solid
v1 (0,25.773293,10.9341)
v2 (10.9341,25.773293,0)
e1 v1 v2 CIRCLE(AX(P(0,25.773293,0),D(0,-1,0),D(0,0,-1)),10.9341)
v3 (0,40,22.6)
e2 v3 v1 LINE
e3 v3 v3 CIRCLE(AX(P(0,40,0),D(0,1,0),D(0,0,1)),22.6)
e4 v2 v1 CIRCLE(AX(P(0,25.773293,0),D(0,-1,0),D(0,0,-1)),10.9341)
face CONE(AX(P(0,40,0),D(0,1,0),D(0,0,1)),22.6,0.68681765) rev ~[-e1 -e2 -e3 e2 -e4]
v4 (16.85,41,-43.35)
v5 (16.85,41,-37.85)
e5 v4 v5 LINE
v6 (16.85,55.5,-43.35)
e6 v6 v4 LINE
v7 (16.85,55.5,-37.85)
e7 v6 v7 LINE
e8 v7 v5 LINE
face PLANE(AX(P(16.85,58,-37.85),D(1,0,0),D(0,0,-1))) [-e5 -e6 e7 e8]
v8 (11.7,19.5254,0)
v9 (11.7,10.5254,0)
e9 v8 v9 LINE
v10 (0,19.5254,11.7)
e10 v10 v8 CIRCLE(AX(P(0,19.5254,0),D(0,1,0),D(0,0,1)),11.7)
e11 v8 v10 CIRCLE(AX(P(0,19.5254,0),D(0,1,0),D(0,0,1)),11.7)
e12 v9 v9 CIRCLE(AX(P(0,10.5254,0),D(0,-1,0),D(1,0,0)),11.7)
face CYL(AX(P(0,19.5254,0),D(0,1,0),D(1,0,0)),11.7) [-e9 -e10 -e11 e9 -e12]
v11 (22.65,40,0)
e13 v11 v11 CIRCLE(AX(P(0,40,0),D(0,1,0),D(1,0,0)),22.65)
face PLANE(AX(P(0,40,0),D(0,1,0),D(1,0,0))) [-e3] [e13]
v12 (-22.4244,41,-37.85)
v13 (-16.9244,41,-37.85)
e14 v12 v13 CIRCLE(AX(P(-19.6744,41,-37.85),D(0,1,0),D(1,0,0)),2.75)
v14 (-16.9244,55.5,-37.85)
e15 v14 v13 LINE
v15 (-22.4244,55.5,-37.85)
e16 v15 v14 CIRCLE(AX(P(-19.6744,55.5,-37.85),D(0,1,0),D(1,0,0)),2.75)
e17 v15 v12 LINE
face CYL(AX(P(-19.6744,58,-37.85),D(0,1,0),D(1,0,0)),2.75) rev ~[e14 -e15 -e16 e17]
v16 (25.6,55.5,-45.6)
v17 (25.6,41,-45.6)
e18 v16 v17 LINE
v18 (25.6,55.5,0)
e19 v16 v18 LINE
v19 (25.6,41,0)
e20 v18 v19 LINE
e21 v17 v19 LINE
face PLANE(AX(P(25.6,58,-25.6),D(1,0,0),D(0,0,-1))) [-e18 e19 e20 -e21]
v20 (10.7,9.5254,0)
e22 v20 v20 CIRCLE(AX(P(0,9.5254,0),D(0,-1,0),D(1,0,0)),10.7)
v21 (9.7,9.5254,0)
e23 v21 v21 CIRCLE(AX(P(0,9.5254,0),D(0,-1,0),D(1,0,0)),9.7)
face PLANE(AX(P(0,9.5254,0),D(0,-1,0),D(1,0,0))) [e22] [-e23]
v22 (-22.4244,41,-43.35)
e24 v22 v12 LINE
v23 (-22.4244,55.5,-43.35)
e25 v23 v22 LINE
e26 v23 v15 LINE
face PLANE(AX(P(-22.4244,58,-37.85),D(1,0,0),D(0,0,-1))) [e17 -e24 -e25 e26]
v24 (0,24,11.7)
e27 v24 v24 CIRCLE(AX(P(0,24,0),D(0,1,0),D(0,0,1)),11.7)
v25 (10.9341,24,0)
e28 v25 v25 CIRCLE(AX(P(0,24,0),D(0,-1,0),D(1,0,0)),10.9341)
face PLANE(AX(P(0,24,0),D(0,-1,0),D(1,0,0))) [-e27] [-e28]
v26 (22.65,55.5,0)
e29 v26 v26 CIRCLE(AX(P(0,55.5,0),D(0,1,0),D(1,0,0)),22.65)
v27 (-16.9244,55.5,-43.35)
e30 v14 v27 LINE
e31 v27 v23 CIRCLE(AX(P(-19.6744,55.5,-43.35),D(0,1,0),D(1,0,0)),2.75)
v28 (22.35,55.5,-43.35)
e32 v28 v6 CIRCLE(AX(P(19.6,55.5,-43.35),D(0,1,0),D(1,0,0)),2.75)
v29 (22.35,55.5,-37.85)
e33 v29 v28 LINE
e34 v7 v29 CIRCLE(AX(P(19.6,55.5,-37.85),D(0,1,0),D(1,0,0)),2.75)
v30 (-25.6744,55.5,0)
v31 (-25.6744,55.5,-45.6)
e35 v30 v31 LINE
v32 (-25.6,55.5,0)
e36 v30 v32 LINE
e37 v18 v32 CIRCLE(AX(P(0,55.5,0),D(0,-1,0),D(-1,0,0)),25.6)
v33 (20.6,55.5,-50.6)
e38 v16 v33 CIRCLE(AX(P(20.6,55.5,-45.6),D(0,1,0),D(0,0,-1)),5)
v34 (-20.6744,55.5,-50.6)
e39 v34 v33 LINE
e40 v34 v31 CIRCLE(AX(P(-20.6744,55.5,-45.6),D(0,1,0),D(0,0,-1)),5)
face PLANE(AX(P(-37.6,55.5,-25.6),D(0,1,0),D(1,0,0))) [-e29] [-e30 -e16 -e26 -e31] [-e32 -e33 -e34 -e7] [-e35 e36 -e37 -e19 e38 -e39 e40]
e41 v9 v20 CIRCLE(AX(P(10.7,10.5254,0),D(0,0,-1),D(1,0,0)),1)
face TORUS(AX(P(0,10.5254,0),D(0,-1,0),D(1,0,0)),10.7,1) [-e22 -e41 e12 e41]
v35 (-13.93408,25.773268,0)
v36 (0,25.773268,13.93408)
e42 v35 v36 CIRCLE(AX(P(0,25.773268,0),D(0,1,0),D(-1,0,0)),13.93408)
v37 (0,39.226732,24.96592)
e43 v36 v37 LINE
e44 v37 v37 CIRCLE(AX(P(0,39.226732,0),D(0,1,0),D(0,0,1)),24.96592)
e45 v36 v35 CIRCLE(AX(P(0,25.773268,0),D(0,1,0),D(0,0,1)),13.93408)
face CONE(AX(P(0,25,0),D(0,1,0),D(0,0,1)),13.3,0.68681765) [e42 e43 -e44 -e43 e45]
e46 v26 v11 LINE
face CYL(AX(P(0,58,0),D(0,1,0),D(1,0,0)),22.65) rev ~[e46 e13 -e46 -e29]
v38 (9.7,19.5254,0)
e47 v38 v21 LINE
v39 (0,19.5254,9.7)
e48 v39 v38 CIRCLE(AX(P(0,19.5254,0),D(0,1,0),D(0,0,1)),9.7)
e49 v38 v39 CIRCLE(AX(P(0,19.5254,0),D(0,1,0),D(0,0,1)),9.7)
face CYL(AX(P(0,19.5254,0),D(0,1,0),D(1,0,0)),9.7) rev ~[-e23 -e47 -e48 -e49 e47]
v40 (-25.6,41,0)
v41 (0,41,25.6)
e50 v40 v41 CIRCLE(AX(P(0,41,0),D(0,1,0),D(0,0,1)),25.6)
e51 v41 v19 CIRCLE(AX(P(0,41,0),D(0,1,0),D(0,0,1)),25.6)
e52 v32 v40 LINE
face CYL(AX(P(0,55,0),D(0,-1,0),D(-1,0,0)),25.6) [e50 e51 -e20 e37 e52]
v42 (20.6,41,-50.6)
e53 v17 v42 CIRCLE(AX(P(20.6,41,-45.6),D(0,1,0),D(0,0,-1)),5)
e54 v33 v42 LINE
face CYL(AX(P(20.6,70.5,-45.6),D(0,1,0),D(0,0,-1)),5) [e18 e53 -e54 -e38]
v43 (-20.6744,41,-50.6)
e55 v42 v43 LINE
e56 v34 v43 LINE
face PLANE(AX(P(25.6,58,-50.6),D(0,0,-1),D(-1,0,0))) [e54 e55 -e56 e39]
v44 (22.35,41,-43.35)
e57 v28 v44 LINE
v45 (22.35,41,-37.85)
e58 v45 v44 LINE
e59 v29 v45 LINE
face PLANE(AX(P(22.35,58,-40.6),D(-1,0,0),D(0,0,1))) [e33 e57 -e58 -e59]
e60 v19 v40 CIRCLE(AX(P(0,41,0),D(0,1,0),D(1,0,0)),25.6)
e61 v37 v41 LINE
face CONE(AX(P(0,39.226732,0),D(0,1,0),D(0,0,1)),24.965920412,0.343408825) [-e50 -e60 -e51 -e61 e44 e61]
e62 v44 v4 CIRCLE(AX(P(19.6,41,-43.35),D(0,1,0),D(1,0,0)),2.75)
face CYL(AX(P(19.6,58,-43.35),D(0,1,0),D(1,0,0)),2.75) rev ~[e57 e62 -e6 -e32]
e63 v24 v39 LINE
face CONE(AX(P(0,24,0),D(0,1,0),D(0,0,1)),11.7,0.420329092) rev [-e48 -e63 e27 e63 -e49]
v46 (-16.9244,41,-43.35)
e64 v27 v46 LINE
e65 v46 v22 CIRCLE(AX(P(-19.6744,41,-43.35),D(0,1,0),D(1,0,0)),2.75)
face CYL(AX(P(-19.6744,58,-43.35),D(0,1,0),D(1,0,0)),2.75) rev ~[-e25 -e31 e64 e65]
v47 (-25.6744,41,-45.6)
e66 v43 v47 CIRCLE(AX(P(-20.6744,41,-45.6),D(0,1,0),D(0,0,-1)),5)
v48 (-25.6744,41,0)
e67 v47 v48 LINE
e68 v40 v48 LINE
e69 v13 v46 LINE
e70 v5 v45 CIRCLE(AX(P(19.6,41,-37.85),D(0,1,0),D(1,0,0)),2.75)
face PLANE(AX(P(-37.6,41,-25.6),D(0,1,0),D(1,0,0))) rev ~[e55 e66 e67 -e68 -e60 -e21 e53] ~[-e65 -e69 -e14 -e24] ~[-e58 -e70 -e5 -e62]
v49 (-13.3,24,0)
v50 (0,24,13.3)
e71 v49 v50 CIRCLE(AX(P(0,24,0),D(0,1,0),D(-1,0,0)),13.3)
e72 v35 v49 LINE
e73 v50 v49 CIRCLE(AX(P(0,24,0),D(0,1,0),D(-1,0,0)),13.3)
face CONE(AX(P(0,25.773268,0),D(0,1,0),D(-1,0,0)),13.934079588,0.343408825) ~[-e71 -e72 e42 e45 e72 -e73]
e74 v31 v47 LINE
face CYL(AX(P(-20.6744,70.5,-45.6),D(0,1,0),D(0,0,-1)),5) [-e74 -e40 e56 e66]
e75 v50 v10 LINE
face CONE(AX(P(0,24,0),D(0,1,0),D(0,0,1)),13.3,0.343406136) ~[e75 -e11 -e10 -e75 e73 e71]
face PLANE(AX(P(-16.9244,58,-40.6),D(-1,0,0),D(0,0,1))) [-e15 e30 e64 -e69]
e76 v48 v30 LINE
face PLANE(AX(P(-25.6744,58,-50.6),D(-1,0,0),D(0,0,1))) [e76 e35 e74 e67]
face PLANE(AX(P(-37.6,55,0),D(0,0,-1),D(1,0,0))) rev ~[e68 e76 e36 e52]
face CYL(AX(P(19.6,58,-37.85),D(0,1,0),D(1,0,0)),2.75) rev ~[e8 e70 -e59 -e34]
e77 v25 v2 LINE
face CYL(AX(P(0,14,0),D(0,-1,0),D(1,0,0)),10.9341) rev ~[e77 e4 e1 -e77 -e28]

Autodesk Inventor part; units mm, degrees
ref_plane "YZ Plane" through (0, 0, 0) normal (1, 0, 0) x (0, 1, 0)
ref_plane "XZ Plane" through (0, 0, 0) normal (0, 1, 0) x (-1, 0, 0)
sketch "Sketch1" plane through (0, 0, 0) normal (0, 1, 0) x (-1, 0, 0)
  circle A0 centre (0, 0) radius 10.3
  circle A1 centre (0, 0) radius 13.3
  dimension "d0" = 20.6
  dimension "d1" = 3
extrude "Extrusion1" add sketch "Sketch1" along normal blind 25
sketch "Sketch2" plane through (0, 0, 0) normal (0, 0, 1) x (1, 0, 0)
  circle A0 centre (0, 4) radius 16
  line L0 (13.3, 25) -> (-13.3, 25) projected
  line L1 (0, 25) -> (0, 20)
  point P0 (0, 0)
  dimension "d4" = 32
  dimension "d5" = 5
extrude "Extrusion2" cut sketch "Sketch2" against normal through all both and the other way through all
sketch "Sketch4" plane through (0, 0, 0) normal (1, 0, 0) x (0, 1, 0)
  line L0 (20, 13.3) -> (25, 13.3) projected
  line L1 (25, 13.3) -> (40, 25.6)
  line L2 (40, 25.6) -> (55, 25.6)
  line L3 (55, 25.6) -> (55, 22.6)
  line L4 (55, 22.6) -> (40, 22.6)
  line L5 (25, 10.3) -> (25, -10.3) projected
  line L6 (40, 22.6) -> (25, 10.3)
  line L7 (0, 0) -> (85.2959, 0)
  line L8 (25, 13.3) -> (25, 10.3)
  line L9 (25, -13.3) -> (25, 13.3) projected
  point P0 (25, 0)
  dimension "d8" = 22.6
  dimension "d9" = 3
  dimension "d11" = 15
  dimension "d12" = 30
revolve "Revolution1" add sketch "Sketch4" angle 360 about axis through (0, 0, 0) along (0, 1, 0)
chamfer "Chamfer1" distance 1 angle 45 5 edges at (0, 40, -25.6) (0, 55, -22.6) (10.3, 16.2438, -0.0012) (9.4045, 25, -9.4045) (-9.4045, 25, 9.4045)
sketch "Sketch5" plane through (0, 0, 0) normal (0, 1, 0) x (-1, 0, 0)
  circle A0 centre (0, 0) radius 13.9341 projected
  circle A1 centre (0, 0) radius 35.7982
  point P0 (0, 0)
extrude "Extrusion3" cut sketch "Sketch5" along normal blind 24 contours A0 | A1
sketch "Sketch6" plane through (0, 24, 0) normal (0, -1, 0) x (1, 0, 0)
  circle A0 centre (0, 0) radius 10.3
  circle A1 centre (0, 0) radius 13.3
extrude "Extrusion4" add sketch "Sketch6" along normal blind 10
sketch "Sketch7" plane through (0, 14, 0) normal (0, -1, 0) x (1, 0, 0)
  circle A0 centre (0, 0) radius 6.75
  circle A1 centre (0, 0) radius 13.3 projected
  circle A2 centre (0, 0) radius 10.3 projected
  dimension "d21" = 13.5
extrude "Extrusion5" add sketch "Sketch7" against normal blind 11 contours A1 | A2
fillet "Fillet1" radius 2 1 edges at (-6.75, 14, 0)
sketch "Sketch8" plane through (0, 55, 0) normal (0, 1, 0) x (1, 0, 0)
  circle A0 centre (0, 0) radius 22.8
  dimension "d28" = 45.6
extrude "Extrusion6" cut sketch "Sketch8" against normal blind 15
sketch "Sketch10" plane through (0, 55, 0) normal (0, 1, 0) x (1, 0, 0)
  line L0 (-37.6, 25.6) -> (37.6, 25.6)
  line L1 (37.6, 25.6) -> (37.6, 0)
  line L2 (37.6, 0) -> (-37.6, 0)
  line L3 (-37.6, 0) -> (-37.6, 25.6)
  circle A0 centre (0, 0) radius 25.6 projected
  circle A1 centre (0, 0) radius 25.6 projected
  point P0 (-25.6, 0)
  point P1 (25.6, 0)
  point P2 (0, 25.6)
  point P3 (25.6, 0)
  dimension "d34" = 12
  dimension "d35" = 12
extrude "Extrusion8" add sketch "Sketch10" against normal blind 14 contours L0 A0 L2 L3 | L0 L1 L2 A0
sketch "Sketch11" plane through (-37.6, 55, -25.6) normal (0, 1, 0) x (1, 0, 0)
  line L0 (0, -25.6) -> (12, -25.6) projected
  line L1 (75.2, 0) -> (0, 0) projected
  line L2 (12, -25.6) -> (0, 0)
  line L3 (0, 0) -> (0, -25.6)
  arc A0 (12, -25.6) -> (63.2, -25.6) centre (37.6, -25.6) ccw projected
  line L4 (12, -25.6) -> (0, -25.6)
  arc A1 (63.2, -25.6) -> (37.6, 0) centre (37.6, -25.6) ccw projected
  line L5 (63.2, -25.6) -> (75.2, 0)
  line L6 (63.2, -25.6) -> (75.2, -25.6) projected
  line L7 (63.2, -25.6) -> (75.2, -25.6)
  line L8 (75.2, 0) -> (75.2, -25.6) projected
  line L9 (75.2, -25.6) -> (75.2, 0)
extrude "Extrusion9" [suppressed]
sketch "Sketch12" plane through (0, 0, 0) normal (0, 0, 1) x (1, 0, 0)
  circle A0 centre (-31.1, 48) radius 4.75
  circle A1 centre (31.1, 48) radius 4.75
  line L0 (-37.6, 55) -> (-37.6, 41) projected
  line L1 (37.6, 55) -> (37.6, 41) projected
  line L2 (37.6, 41) -> (25.6, 41) projected
  point P0 (0, 0)
  dimension "d40" = 9.5
  dimension "d41" = 6.5
  dimension "d42" = 6.5
  dimension "d43" = 7
extrude "Extrusion10" [suppressed]
sketch "Sketch13" plane through (0, 0, -21.6) normal (0, 0, 1) x (1, 0, 0)
  arc A0 (-35.725, 46.9175) -> (-35.725, 49.0825) centre (-31.1, 48) ccw projected
  circle A1 centre (-31.1, 48) radius 2.75
  arc A2 (35.725, 49.0825) -> (35.725, 46.9175) centre (31.1, 48) ccw projected
  circle A3 centre (31.1, 48) radius 2.75
  point P0 (0, 0)
  dimension "d46" = 5.5
extrude "Extrusion11" [suppressed]
sketch "Sketch17" plane through (0, 14, 0) normal (0, -1, 0) x (1, 0, 0)
  circle A0 centre (0, 0) radius 10.9341
  circle A1 centre (0, 0) radius 13.9341 projected
  dimension "d53" = 3
extrude "Extrusion12" cut sketch "Sketch17" against normal through all contours A0
sketch "Sketch18" plane through (0, 14, 0) normal (0, -1, 0) x (1, 0, 0)
  circle A0 centre (0, 0) radius 20.3
  circle A1 centre (0, 0) radius 13.3 projected
  dimension "d56" = 7
extrude "Extrusion13" add sketch "Sketch18" against normal blind 3
chamfer "Chamfer3" distance 7 angle 45 1 edges at (-13.3, 17, 0)
ref_plane "Work Plane1" through (-37.6, 24, -25.6) normal (0, 1, 0) x (1, 0, 0)
sketch "Sketch20" plane through (-37.6, 24, -25.6) normal (0, 1, 0) x (1, 0, 0)
  circle A0 centre (20.6, -25.6) radius 3
  line L0 (20.6, -29.0641) -> (17.6, -27.3321)
  line L1 (17.6, -27.3321) -> (17.6, -23.8679)
  line L2 (17.6, -23.8679) -> (20.6, -22.1359)
  line L3 (20.6, -22.1359) -> (23.6, -23.8679)
  line L4 (23.6, -23.8679) -> (23.6, -27.3321)
  line L5 (23.6, -27.3321) -> (20.6, -29.0641)
  point P0 (37.6, -25.6)
  dimension "d64" = 6
  dimension "d65" = 17
extrude "Extrusion14" cut sketch "Sketch20" against normal blind 7
sketch "Sketch21" plane through (0, 14, 0) normal (0, -1, 0) x (1, 0, 0)
  circle A0 centre (-17, 0) radius 1.75
  point P0 (0, 0)
  dimension "d68" = 3.5
  dimension "d69" = 17
extrude "Extrusion15" cut sketch "Sketch21" against normal blind 10
pattern_circular "Circular Pattern1" count 6 over 360 about axis through (0, 47.5, 0) along (0, 1, 0) of "Extrusion15", "Extrusion14"
sketch "Sketch23" plane through (-37.6, 55, -25.6) normal (0, 1, 0) x (1, 0, 0)
  line L0 (75.2, 0) -> (0, 0) projected
  arc A0 (12, -25.6) -> (63.2, -25.6) centre (37.6, -25.6) ccw projected
  circle A1 centre (37.6, -25.6) radius 23.6 projected
  circle A2 centre (37.6, -25.6) radius 22.8 projected
  line L1 (63.2, -25.6) -> (75.2, -25.6) projected
  line L2 (75.2, -25.6) -> (75.2, 0) projected
  line L3 (0, 0) -> (0, -25.6) projected
  line L4 (0, -25.6) -> (12, -25.6) projected
sketch "Sketch24" plane through (-37.6, 55, -25.6) normal (0, 1, 0) x (1, 0, 0)
  circle A0 centre (37.6, -25.6) radius 23.6
  circle A1 centre (37.6, -25.6) radius 23.6 projected
  circle A2 centre (37.6, -25.6) radius 22.8
  circle A3 centre (37.6, -25.6) radius 22.8 projected
extrude "Extrusion16" add sketch "Sketch24" against normal blind 2
sketch "Sketch25" plane through (-37.6, 55, -25.6) normal (0, 1, 0) x (1, 0, 0)
  circle A0 centre (37.6, -25.6) radius 22.8 projected
  line L0 (75.2, 0) -> (0, 0) projected
  arc A1 (12, -25.6) -> (63.2, -25.6) centre (37.6, -25.6) ccw projected
  line L1 (63.2, -25.6) -> (75.2, -25.6) projected
  line L2 (75.2, -25.6) -> (75.2, 0) projected
  line L3 (0, 0) -> (0, -25.6) projected
  line L4 (0, -25.6) -> (12, -25.6) projected
extrude "Extrusion17" add sketch "Sketch25" along normal blind 3
sketch "Sketch26" plane through (-37.6, 58, -25.6) normal (0, 1, 0) x (1, 0, 0)
  line L0 (11.9256, -25.6) -> (63.2, -25.6)
  line L1 (63.2, -25.6) -> (63.2, 25)
  line L2 (63.2, 25) -> (11.9256, 25)
  line L3 (11.9256, 25) -> (11.9256, -25.6)
  line L4 (75.2, 0) -> (0, 0) projected
  circle A0 centre (17.9256, 15) radius 2.75
  circle A1 centre (57.2, 15) radius 2.75
  line L5 (37.6, 0) -> (75.2, 0) projected
  line L6 (63.2, 0) -> (11.9256, 0)
  line L7 (0, 0) -> (37.6, 0) projected
  point P0 (37.6, -25.6)
  point P1 (11.9256, 0)
  point P2 (63.2, 0)
  dimension "d79" = 25
  dimension "d80" = 5.5
  dimension "d81" = 6
  dimension "d82" = 6
  dimension "d91" = 15
extrude "Extrusion18" add sketch "Sketch26" against normal up to surface (17 mm away) contours L3 L2 L1 L4
sketch "Sketch27" plane through (-37.6, 58, -25.6) normal (0, 1, 0) x (1, 0, 0)
  line L0 (11.9256, 25) -> (11.9256, 0) projected
  line L1 (-19.2052, -40.8404) -> (11.9256, -40.8404)
  line L2 (11.9256, -40.8404) -> (11.9256, 11.2059)
  line L3 (11.9256, 11.2059) -> (-19.2052, 11.2059)
  line L4 (-19.2052, 11.2059) -> (-19.2052, -40.8404)
  line L5 (63.2, 0) -> (63.2, 25) projected
  line L6 (63.2, 17.9527) -> (82.2369, 17.9527)
  line L7 (82.2369, 17.9527) -> (82.2369, -35.178)
  line L8 (82.2369, -35.178) -> (63.2, -35.178)
  line L9 (63.2, -35.178) -> (63.2, 17.9527)
  point P0 (37.6, -25.6)
extrude "Extrusion19" cut sketch "Sketch27" against normal through all
sketch "Sketch28" plane through (-37.6, 58, -25.6) normal (0, 1, 0) x (1, 0, 0)
  line L0 (20.6756, 12.25) -> (15.1756, 12.25)
  line L1 (15.1756, 12.25) -> (15.1756, 17.75)
  line L2 (15.1756, 17.75) -> (20.6756, 17.75)
  line L3 (20.6756, 17.75) -> (20.6756, 12.25)
  circle A0 centre (17.9256, 15) radius 2.75 projected
  line L4 (20.6756, 12.25) -> (15.1756, 17.75) construction
  line L5 (15.1756, 12.25) -> (20.6756, 17.75) construction
  line L6 (59.95, 12.25) -> (54.45, 12.25)
  line L7 (54.45, 12.25) -> (54.45, 17.75)
  line L8 (54.45, 17.75) -> (59.95, 17.75)
  line L9 (59.95, 17.75) -> (59.95, 12.25)
  circle A1 centre (57.2, 15) radius 2.75 projected
  line L10 (59.95, 12.25) -> (54.45, 17.75) construction
  line L11 (54.45, 12.25) -> (59.95, 17.75) construction
  circle A2 centre (17.9256, 12.25) radius 2.75
  circle A3 centre (17.9256, 17.75) radius 2.75
  circle A4 centre (57.2, 12.25) radius 2.75
  circle A5 centre (57.2, 17.75) radius 2.75
  point P0 (37.6, -25.6)
  point P1 (20.6756, 12.25)
  point P2 (20.6756, 17.75)
  dimension "d87" = 5.5
  dimension "d88" = 5.5
extrude "Extrusion20" cut sketch "Sketch28" against normal through all
sketch "Sketch29" plane through (0, 14, 0) normal (0, -1, 0) x (1, 0, 0)
  circle A0 centre (0, 0) radius 35.383
extrude "Extrusion21" cut sketch "Sketch29" against normal blind 10
sketch "Sketch31" plane through (0, 0, 0) normal (1, 0, 0) x (0, 1, 0)
  line L0 (24, 13.3) -> (25.7733, 13.9341) projected
  line L1 (24, 13.3) -> (19.5254, 11.7)
  line L2 (10.3519, 0) -> (30.0392, 0)
  line L3 (24, -13.3) -> (24, 13.3) projected
  line L4 (24, 11.7) -> (19.5254, 9.7)
  line L5 (19.5254, 11.7) -> (19.5254, 9.7)
  line L6 (24, 11.7) -> (24, 13.3)
  point P0 (0, 0)
  dimension "d95" = 11.7
  dimension "d96" = 2
revolve "Revolution2" add sketch "Sketch31" angle 360 about axis through (0, 10.3519, 0) along (0, 1, 0)
sketch "Sketch32" plane through (0, 19.5254, 0) normal (0, -1, 0) x (1, 0, 0)
  circle A0 centre (0, 0) radius 9.7 projected
  circle A1 centre (0, 0) radius 11.7 projected
extrude "Extrusion22" add sketch "Sketch32" along normal blind 10
sketch "Sketch33" plane through (-37.6, 58, -25.6) normal (0, 1, 0) x (1, 0, 0)
  circle A0 centre (37.6, -25.6) radius 22.65
  circle A1 centre (37.6, -25.6) radius 22.8
  circle A2 centre (37.6, -25.6) radius 22.8 projected
  dimension "d100" = 45.3
extrude "Extrusion23" add sketch "Sketch33" against normal blind 18
fillet "Fillet2" radius 5 2 edges at (25.6, 49.5, -50.6) (-25.6744, 49.5, -50.6)
fillet "Fillet3" radius 1 1 edges at (-11.7, 9.5254, 0)
sketch "Sketch34" plane through (-37.6, 58, -25.6) normal (0, 1, 0) x (1, 0, 0)
  line L0 (-0.5139, -99.2858) -> (75.7139, -99.2858)
  line L1 (75.7139, -99.2858) -> (75.7139, 48.0858)
  line L2 (75.7139, 48.0858) -> (-0.5139, 48.0858)
  line L3 (-0.5139, 48.0858) -> (-0.5139, -99.2858)
  line L4 (-0.5139, -99.2858) -> (75.7139, 48.0858) construction
  line L5 (75.7139, -99.2858) -> (-0.5139, 48.0858) construction
  point P0 (37.6, -25.6)
extrude "Extrusion24" cut sketch "Sketch34" against normal blind 2.5
properties part number "Chute"
